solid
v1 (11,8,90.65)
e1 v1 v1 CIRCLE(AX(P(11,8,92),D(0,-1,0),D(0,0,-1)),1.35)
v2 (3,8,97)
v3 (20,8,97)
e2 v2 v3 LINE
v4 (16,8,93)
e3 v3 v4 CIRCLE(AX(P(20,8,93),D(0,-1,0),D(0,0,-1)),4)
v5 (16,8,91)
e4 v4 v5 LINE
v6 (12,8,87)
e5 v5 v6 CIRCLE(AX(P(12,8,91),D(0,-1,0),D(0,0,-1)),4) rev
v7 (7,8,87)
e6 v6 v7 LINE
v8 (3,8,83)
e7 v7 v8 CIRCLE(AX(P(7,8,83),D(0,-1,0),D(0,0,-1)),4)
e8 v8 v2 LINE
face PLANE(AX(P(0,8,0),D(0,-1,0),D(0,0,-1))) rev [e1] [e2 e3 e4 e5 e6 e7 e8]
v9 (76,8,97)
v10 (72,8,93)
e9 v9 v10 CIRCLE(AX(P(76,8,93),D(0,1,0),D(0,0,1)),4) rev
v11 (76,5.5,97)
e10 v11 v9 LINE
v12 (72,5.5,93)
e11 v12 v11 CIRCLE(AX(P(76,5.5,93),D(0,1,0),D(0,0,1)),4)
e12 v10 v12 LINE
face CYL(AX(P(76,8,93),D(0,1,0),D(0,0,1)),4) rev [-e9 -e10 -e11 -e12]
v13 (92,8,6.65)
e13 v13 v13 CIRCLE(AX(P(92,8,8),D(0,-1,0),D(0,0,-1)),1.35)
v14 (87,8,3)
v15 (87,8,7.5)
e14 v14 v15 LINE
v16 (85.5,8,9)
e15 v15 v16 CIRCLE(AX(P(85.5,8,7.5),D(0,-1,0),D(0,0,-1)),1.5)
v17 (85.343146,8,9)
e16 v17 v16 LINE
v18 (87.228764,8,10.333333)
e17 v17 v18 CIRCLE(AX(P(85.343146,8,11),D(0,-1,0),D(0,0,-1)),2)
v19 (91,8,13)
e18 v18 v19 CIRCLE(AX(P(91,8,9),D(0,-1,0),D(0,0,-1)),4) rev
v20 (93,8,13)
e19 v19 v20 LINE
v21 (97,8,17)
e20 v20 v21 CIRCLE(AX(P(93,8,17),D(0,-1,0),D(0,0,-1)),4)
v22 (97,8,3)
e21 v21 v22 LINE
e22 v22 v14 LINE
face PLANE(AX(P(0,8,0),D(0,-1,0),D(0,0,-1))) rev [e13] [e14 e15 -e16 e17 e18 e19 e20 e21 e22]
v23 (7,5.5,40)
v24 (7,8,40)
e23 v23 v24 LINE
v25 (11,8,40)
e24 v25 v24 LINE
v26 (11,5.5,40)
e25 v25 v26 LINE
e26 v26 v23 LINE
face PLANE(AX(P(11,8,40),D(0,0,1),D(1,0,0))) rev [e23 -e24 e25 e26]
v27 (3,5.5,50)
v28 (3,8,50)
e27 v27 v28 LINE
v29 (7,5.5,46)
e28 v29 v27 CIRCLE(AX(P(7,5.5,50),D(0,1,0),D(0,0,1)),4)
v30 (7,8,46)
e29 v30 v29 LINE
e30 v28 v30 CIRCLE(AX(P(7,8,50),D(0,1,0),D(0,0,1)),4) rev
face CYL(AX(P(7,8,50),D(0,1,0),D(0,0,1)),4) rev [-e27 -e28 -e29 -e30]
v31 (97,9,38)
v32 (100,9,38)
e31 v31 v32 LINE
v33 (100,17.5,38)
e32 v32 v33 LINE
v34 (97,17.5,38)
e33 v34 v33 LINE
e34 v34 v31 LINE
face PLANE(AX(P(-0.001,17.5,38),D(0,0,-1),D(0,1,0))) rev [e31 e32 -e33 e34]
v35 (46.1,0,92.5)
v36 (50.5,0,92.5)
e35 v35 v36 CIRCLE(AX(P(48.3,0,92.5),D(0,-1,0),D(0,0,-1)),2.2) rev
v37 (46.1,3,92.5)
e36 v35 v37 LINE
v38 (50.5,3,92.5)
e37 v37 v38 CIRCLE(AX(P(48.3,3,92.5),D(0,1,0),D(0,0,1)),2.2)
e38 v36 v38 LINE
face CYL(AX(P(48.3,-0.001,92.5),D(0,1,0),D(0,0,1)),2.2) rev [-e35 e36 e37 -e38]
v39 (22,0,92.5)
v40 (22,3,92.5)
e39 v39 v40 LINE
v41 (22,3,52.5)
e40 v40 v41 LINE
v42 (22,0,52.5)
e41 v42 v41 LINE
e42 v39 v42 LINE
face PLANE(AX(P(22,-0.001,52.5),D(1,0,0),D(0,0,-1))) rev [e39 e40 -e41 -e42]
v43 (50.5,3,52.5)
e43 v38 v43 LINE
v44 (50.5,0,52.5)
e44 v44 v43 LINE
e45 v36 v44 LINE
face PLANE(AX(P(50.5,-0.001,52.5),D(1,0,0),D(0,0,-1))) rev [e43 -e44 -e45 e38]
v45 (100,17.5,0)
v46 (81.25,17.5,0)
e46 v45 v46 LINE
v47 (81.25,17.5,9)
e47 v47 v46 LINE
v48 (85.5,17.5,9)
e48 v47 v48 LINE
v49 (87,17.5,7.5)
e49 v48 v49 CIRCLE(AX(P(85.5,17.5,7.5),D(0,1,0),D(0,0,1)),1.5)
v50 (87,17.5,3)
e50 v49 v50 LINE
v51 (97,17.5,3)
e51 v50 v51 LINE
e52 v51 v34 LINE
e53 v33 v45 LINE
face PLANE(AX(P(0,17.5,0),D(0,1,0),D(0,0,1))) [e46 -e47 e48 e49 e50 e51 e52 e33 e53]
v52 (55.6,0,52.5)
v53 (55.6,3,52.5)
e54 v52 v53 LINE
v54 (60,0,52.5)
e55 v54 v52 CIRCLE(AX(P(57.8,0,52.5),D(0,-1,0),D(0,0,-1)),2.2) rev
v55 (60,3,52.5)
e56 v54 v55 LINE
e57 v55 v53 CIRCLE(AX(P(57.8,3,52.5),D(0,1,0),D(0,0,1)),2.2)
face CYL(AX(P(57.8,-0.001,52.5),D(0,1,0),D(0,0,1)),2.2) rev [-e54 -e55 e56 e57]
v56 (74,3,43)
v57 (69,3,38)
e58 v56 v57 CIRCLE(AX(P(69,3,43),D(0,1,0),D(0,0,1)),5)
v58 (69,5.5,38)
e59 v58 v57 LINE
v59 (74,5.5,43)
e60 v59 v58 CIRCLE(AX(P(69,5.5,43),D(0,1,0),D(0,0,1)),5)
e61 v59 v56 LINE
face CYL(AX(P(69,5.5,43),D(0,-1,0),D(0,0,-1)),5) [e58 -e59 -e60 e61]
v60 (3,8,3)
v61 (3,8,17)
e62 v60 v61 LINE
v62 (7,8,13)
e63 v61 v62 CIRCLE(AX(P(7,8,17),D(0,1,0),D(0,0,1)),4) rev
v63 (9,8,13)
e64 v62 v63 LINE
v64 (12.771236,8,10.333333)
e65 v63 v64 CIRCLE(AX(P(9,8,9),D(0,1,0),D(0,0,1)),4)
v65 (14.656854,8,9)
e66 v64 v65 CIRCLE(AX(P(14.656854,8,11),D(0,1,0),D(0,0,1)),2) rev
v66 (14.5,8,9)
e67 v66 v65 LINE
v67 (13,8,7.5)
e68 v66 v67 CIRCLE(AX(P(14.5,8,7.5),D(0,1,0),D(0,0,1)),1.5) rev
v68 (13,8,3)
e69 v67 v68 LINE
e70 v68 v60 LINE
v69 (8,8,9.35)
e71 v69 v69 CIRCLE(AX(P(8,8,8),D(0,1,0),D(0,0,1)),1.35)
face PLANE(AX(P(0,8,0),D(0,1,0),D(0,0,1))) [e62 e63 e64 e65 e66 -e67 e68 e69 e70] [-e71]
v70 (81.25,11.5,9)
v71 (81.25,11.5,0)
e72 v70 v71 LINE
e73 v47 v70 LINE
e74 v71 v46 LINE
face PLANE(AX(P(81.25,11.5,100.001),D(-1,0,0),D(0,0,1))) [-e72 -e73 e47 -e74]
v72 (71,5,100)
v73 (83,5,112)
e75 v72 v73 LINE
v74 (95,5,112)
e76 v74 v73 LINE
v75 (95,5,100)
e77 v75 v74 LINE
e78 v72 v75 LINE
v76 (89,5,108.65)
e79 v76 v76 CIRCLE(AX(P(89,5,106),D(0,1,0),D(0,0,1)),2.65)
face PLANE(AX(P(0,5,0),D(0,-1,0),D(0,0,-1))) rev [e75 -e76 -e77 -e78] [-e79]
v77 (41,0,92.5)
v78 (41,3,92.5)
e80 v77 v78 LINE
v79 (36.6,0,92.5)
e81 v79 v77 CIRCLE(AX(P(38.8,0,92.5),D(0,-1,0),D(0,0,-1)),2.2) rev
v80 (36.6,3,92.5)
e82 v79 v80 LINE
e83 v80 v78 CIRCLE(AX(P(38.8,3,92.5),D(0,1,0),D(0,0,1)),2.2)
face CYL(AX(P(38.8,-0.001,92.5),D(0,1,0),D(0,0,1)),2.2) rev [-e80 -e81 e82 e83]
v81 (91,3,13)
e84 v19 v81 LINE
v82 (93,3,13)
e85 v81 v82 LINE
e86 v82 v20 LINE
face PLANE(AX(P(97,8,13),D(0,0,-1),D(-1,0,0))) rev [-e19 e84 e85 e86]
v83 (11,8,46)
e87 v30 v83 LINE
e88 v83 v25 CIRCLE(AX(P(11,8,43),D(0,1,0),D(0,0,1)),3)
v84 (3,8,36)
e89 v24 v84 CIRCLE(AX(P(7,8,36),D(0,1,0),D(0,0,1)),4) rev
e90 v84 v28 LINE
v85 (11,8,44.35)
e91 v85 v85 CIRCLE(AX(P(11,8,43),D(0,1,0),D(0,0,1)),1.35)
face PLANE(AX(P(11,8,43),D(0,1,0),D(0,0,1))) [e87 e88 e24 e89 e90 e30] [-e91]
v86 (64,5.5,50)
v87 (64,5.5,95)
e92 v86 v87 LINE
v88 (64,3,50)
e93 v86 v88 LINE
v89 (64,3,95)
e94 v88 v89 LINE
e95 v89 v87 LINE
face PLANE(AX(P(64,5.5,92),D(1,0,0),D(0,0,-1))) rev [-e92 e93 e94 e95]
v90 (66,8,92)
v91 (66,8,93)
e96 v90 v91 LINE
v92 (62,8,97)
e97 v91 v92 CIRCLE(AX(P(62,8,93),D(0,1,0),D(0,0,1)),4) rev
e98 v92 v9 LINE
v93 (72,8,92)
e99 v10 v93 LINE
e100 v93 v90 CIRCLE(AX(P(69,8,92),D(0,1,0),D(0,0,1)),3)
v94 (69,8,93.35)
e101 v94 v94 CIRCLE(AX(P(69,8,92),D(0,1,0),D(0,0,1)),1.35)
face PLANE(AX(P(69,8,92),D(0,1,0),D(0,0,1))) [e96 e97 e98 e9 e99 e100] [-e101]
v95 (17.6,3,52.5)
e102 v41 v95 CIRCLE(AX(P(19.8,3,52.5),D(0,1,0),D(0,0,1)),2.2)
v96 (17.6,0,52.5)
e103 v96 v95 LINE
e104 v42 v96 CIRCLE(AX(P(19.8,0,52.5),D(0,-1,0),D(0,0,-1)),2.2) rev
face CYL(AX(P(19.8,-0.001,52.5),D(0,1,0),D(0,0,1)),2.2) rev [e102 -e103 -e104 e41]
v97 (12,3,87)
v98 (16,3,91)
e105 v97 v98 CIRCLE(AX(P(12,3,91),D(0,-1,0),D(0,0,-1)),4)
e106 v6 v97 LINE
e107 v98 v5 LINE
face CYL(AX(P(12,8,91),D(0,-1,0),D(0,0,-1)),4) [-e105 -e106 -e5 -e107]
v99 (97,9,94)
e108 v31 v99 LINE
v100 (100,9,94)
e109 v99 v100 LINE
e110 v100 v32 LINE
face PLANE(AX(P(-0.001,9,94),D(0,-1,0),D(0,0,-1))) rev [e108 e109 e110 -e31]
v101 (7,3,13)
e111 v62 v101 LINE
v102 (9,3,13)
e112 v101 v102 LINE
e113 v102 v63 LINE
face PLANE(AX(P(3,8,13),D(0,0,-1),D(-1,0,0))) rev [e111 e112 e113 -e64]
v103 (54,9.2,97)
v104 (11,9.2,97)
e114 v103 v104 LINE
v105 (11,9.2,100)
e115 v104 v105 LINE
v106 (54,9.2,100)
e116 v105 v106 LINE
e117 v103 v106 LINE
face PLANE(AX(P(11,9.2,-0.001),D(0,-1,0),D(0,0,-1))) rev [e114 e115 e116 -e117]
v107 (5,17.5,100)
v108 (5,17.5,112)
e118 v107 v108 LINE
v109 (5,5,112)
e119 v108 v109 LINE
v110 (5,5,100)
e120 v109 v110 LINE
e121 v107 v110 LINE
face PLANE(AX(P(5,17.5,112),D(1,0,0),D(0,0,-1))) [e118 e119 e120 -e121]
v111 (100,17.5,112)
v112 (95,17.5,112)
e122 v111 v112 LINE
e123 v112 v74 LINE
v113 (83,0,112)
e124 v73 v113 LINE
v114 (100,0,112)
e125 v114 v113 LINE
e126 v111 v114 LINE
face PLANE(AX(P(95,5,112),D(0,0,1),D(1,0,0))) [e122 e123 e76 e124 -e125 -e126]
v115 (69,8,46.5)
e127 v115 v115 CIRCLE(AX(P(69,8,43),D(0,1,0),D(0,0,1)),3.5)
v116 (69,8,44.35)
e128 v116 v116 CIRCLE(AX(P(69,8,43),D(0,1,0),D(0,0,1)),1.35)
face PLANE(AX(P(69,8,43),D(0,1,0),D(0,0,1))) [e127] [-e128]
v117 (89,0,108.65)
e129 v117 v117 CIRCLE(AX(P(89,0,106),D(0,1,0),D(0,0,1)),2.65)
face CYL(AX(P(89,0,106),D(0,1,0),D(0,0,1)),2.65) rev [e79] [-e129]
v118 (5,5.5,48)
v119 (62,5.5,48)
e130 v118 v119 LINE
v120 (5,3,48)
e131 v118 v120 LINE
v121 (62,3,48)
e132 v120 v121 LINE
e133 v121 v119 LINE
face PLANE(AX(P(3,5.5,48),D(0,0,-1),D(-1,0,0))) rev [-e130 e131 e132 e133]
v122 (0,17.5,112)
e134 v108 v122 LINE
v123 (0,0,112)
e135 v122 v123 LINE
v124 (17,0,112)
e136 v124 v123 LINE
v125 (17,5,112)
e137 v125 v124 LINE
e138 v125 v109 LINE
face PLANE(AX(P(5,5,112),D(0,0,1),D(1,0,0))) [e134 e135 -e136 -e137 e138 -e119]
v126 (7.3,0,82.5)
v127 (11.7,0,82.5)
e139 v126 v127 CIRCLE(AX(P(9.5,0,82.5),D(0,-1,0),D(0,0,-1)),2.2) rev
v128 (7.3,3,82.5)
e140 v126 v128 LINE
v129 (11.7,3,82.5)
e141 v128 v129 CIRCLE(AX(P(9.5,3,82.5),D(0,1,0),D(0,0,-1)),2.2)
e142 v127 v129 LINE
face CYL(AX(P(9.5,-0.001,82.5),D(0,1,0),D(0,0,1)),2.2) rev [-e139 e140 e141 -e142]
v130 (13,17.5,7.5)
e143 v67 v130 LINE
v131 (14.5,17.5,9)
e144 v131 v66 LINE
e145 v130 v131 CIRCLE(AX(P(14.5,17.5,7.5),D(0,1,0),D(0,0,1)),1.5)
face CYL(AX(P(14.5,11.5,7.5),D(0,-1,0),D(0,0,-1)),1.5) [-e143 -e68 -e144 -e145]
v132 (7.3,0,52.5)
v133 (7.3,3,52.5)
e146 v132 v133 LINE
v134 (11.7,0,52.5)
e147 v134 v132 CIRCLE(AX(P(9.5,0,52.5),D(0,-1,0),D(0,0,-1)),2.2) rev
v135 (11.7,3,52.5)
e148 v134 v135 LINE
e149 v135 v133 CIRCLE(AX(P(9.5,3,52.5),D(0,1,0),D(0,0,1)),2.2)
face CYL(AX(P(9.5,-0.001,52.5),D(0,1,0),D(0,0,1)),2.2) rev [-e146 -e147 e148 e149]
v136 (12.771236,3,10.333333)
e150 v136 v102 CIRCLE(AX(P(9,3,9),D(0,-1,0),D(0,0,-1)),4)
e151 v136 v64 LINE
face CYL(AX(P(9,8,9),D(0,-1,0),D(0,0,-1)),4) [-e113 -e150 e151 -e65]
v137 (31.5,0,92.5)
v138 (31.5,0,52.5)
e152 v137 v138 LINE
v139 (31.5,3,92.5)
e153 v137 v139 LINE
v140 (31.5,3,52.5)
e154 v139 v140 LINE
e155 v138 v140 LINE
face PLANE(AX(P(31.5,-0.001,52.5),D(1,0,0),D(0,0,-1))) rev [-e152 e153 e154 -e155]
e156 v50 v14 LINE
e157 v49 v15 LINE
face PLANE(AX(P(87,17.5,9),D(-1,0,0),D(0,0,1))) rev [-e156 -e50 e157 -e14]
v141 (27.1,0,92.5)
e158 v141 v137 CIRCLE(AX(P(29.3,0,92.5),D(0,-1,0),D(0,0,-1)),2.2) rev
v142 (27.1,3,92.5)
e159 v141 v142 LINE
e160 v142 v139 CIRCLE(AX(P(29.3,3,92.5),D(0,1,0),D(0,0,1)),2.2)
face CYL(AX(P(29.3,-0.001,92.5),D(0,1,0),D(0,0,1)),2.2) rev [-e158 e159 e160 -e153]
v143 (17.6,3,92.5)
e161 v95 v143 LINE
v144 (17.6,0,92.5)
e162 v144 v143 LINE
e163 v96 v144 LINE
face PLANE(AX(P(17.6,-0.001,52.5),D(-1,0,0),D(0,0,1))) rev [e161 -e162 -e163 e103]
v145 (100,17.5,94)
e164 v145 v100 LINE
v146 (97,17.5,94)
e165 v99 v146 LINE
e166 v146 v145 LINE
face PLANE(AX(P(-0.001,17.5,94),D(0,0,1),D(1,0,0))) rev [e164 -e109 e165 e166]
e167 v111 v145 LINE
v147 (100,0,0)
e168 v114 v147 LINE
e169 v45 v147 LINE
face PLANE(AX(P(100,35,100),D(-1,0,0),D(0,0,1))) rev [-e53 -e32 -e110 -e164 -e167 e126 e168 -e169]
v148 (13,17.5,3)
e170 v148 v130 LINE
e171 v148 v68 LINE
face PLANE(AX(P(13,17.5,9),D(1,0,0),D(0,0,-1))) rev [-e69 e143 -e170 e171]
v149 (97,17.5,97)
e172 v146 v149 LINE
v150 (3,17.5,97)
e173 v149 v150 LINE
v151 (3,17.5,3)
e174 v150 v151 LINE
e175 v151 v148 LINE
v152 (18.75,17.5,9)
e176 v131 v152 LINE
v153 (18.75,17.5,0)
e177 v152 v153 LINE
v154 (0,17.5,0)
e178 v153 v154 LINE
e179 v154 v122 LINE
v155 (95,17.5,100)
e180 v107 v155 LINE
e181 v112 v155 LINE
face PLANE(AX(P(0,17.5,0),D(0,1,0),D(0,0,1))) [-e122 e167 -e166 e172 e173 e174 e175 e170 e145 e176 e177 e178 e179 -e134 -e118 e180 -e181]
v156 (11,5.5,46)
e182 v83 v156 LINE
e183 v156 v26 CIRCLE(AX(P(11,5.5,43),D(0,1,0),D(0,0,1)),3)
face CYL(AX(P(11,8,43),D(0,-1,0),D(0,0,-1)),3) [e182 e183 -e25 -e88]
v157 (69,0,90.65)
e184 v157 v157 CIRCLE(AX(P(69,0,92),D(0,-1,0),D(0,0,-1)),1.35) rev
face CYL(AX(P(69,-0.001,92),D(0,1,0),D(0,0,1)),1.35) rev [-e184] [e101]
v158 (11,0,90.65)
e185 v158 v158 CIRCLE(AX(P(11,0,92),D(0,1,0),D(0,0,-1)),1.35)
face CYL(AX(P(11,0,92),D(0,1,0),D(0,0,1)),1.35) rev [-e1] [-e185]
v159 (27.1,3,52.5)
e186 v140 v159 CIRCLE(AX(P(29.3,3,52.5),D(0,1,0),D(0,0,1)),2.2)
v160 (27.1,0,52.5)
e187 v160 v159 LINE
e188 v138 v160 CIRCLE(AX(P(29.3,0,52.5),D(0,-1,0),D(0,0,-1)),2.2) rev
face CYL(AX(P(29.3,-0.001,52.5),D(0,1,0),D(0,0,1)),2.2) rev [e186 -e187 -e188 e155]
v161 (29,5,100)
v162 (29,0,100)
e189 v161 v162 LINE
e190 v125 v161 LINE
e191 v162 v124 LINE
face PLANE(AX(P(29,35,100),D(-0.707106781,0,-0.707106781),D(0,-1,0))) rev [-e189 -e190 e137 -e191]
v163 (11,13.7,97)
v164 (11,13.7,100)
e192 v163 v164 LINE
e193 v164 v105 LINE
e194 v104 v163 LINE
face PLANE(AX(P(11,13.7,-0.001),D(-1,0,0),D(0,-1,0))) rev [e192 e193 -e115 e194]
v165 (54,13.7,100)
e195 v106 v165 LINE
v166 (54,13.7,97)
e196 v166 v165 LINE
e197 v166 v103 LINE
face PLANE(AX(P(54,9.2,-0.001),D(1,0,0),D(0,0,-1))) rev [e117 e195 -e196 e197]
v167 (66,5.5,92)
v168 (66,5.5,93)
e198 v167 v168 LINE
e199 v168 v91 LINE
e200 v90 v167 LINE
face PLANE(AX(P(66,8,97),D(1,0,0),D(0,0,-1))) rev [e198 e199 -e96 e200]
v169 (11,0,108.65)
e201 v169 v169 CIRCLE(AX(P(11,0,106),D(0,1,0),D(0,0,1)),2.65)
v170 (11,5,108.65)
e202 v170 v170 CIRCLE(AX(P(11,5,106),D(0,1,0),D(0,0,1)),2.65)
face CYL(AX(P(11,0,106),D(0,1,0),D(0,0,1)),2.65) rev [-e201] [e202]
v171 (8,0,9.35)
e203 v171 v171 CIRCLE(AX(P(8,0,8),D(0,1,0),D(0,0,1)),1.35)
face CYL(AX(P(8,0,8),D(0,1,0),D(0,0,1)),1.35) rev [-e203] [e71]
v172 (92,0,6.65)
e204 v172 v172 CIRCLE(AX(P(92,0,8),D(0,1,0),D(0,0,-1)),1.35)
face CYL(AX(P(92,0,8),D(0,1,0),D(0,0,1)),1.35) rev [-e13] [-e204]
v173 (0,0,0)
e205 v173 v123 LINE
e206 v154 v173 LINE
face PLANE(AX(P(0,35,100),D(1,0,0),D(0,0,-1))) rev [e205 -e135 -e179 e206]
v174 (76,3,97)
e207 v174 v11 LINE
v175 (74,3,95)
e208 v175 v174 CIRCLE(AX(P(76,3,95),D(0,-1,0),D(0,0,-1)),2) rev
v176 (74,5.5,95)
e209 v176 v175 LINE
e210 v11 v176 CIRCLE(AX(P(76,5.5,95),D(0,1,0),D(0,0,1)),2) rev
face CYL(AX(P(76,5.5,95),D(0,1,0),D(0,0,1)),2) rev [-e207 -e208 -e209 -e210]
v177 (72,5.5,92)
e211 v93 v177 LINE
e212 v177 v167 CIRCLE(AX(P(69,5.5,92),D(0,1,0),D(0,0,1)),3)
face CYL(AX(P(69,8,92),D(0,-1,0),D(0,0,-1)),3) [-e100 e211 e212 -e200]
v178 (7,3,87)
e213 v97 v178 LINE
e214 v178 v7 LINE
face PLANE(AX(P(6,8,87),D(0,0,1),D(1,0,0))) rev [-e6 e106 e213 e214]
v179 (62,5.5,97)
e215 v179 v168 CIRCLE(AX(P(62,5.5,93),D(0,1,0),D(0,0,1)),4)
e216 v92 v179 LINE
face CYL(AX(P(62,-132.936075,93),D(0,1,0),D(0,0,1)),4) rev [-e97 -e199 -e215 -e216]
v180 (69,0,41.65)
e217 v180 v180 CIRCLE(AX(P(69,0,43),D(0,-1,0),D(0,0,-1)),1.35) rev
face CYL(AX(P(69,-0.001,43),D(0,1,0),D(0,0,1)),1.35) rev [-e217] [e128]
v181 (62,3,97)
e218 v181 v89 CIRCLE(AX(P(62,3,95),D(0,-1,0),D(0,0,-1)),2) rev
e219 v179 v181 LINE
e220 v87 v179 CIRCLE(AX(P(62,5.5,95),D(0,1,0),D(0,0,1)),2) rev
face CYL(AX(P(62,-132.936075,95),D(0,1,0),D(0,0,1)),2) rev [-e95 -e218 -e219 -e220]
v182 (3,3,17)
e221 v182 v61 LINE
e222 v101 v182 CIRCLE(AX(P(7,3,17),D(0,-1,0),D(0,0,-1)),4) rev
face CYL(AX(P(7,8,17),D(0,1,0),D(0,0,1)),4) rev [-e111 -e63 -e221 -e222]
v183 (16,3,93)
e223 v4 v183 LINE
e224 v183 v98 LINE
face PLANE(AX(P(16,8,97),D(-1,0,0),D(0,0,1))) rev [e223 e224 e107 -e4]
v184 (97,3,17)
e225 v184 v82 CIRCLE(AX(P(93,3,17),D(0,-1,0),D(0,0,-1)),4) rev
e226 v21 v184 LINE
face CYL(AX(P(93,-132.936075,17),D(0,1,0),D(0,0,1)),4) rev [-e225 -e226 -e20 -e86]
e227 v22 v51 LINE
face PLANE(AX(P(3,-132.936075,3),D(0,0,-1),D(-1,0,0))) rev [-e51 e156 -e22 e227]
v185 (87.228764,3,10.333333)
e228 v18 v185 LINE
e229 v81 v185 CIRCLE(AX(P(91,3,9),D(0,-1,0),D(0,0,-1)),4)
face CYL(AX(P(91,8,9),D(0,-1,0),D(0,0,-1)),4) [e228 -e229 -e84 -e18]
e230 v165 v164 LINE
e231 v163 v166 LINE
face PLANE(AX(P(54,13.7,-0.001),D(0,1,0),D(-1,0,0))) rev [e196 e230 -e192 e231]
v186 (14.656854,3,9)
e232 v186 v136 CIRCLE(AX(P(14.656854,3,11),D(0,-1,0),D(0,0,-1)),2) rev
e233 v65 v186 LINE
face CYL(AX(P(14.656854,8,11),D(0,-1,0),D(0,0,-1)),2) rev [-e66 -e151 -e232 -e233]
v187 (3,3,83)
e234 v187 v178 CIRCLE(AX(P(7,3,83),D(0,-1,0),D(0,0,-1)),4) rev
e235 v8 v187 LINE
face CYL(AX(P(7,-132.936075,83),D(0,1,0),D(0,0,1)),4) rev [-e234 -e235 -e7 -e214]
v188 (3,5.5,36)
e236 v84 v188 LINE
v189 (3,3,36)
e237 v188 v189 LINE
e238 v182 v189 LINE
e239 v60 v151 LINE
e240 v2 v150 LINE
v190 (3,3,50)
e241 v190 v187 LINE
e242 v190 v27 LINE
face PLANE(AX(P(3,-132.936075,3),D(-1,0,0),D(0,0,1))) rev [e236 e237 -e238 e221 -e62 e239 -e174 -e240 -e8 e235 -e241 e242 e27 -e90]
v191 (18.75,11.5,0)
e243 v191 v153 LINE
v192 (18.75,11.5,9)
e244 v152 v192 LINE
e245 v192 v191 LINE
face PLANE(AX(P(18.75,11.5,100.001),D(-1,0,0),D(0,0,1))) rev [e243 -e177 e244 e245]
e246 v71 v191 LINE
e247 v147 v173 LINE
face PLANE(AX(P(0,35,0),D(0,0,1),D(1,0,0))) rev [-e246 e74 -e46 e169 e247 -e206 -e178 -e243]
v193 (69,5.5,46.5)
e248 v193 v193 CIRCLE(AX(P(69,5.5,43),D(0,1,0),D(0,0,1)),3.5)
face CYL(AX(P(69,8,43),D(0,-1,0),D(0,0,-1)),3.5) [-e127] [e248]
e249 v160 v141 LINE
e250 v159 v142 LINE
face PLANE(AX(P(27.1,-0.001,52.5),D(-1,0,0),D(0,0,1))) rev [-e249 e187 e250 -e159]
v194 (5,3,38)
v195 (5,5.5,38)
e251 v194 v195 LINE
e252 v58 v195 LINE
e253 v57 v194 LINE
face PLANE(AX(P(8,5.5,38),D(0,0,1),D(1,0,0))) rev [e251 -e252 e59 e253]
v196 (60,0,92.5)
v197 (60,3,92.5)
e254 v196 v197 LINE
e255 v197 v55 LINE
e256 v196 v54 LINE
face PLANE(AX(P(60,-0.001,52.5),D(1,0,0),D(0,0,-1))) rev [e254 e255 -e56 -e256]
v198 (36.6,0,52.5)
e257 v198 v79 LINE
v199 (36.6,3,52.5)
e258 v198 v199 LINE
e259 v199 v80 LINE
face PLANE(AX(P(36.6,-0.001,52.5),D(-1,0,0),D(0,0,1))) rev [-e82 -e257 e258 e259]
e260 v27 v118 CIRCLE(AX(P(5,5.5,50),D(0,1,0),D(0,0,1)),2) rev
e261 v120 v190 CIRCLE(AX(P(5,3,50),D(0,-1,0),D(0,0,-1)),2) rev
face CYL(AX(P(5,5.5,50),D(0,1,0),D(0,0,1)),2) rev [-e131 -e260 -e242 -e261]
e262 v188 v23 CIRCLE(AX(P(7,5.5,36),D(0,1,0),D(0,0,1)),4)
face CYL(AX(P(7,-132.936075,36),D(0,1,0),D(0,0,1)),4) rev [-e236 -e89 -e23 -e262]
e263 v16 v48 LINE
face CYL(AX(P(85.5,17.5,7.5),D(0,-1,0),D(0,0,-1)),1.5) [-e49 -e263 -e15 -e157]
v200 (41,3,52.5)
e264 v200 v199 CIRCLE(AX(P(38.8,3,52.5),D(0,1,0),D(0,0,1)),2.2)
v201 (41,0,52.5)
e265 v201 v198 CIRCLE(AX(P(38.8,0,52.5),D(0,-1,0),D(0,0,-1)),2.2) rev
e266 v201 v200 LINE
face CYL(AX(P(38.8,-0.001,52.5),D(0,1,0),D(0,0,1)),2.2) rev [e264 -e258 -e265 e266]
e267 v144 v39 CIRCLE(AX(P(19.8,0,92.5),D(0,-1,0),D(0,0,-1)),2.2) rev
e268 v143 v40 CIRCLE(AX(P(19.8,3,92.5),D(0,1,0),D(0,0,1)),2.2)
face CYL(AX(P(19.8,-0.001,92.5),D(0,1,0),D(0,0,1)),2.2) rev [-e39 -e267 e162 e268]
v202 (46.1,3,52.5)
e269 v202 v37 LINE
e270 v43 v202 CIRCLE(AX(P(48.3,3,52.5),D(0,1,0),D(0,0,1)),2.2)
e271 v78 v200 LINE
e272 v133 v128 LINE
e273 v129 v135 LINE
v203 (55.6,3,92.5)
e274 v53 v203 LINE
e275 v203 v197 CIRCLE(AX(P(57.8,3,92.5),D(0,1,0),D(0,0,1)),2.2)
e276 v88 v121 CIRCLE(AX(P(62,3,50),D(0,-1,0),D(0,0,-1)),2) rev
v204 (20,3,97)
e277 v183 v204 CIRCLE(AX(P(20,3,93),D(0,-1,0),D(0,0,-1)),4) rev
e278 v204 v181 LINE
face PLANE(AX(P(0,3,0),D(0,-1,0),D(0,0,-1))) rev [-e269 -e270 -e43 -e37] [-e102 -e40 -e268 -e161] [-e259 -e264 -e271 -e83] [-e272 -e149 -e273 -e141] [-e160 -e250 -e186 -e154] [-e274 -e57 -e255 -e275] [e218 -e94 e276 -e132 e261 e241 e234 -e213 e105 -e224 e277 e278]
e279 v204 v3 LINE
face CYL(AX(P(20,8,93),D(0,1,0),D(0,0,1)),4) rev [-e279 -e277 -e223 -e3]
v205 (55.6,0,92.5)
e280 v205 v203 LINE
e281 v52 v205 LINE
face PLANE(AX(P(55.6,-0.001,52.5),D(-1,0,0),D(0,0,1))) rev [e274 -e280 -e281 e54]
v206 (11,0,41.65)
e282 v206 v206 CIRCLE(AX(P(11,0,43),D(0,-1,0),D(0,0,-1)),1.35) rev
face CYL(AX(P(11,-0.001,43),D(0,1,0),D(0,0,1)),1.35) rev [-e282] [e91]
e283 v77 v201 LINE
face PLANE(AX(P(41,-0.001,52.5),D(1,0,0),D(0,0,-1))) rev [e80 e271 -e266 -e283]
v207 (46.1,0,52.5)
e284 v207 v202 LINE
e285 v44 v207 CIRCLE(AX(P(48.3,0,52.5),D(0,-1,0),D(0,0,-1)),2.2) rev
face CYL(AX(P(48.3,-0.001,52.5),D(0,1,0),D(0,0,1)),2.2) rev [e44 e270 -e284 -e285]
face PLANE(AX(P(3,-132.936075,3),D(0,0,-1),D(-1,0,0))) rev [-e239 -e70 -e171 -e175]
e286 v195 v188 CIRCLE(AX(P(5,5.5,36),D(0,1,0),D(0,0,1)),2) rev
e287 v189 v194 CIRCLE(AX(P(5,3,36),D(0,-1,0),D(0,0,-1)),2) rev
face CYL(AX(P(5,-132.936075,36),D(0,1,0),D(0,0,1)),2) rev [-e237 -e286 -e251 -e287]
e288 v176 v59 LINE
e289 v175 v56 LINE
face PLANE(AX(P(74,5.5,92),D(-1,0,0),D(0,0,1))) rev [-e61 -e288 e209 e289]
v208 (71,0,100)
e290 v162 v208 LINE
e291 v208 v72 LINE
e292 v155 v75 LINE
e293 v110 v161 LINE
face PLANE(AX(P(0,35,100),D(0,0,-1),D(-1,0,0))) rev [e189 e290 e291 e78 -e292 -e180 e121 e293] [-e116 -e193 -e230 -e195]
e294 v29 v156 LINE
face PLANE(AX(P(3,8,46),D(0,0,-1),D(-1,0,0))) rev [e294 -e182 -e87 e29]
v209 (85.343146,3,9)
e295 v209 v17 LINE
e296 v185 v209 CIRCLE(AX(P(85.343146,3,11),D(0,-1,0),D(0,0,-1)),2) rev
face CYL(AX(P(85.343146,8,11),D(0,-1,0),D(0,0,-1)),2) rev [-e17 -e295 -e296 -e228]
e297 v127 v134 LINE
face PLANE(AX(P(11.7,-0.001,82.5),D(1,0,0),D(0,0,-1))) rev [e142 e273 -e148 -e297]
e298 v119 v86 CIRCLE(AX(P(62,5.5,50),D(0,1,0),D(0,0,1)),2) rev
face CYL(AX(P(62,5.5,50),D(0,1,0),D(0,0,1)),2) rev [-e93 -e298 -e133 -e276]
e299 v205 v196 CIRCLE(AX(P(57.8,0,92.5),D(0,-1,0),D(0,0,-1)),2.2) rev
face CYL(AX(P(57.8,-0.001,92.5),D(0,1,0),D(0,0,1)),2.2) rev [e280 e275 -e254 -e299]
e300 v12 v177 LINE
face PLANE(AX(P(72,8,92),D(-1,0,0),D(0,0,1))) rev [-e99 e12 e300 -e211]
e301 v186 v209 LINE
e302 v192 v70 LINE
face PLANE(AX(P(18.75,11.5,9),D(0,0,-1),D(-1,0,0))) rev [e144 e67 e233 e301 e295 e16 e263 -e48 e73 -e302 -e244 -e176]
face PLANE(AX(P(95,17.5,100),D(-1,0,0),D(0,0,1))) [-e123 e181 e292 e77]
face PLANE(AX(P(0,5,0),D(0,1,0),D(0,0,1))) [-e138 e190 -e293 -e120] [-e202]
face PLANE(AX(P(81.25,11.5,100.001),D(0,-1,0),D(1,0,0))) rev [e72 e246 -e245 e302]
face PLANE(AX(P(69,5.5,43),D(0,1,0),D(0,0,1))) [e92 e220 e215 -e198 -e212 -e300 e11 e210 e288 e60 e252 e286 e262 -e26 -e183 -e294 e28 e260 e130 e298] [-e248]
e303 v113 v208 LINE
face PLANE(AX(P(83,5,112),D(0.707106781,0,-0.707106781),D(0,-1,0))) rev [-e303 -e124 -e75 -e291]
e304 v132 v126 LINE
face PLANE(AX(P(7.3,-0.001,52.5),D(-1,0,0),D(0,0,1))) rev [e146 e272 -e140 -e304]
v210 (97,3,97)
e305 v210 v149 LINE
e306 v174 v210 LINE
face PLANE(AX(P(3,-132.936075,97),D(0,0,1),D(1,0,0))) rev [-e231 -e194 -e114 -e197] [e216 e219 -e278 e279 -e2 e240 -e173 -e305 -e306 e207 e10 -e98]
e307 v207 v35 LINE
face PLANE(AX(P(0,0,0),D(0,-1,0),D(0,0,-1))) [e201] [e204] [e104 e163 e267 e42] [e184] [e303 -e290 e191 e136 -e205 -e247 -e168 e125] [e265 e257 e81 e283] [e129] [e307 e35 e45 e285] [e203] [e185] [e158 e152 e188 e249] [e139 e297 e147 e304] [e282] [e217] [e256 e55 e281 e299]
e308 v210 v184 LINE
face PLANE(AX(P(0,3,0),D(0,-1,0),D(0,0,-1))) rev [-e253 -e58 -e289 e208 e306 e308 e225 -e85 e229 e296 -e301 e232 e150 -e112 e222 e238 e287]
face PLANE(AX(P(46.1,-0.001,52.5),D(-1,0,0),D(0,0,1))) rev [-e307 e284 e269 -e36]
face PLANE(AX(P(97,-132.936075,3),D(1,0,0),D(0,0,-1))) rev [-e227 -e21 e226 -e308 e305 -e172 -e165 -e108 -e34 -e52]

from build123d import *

# Parameters (mm, degrees)
STOCK_D_1_OUTLINE_W     = 100
STOCK_D_1_OUTLINE_H     = 100
STOCK_D_1_DEPTH         = 3
STOCK_D_1_START         = 3
STOCK_D_1_2_OUTLINE_W   = 100
STOCK_D_1_2_OUTLINE_H   = 100
STOCK_D_1_2_OUTLINE_W_2 = 94
STOCK_D_1_2_OUTLINE_H_2 = 94
STOCK_D_1_2_DEPTH       = 14.5
SKETCH1_W               = 10
SKETCH1_H               = 10
BOSS_EXTRUDE1_DEPTH     = 5
CUT_EXTRUDE1_DEPTH      = 143.162758836
CUT_EXTRUDE1_DEPTH_BACK = 143.162758836
SKETCH3_R               = 1.35
SKETCH22_W              = 3
SKETCH22_H              = 10
BOSS_EXTRUDE7_DEPTH     = 5
FILLET8_R               = 4
BOSS_EXTRUDE5_DEPTH     = 2.5
SKETCH14_R              = 3.5
BOSS_EXTRUDE6_DEPTH     = 2.5
CUT_EXTRUDE2_REACH      = 144.5
SKETCH5_W               = 62.5
SKETCH5_H               = 6
SKETCH11_W              = 62.5
SKETCH11_H              = 6
BOSS_EXTRUDE3_DEPTH     = 8.5
SKETCH13_W              = 5.75
SKETCH13_H              = 6
BOSS_EXTRUDE4_DEPTH     = 14.5
SKETCH16_R              = 1.35
CUT_EXTRUDE3_DEPTH      = 8
CUT_EXTRUDE4_REACH      = 144.5
SKETCH17_W              = 43
SKETCH17_H              = 4.5
CUT_EXTRUDE5_REACH      = 144.5
SKETCH18_W              = 56
SKETCH18_H              = 8.5
FILLET10_R              = 2
FILLET11_R              = 2
FILLET13_R              = 1.5
FILLET14_R              = 4
CUT_EXTRUDE7_REACH      = 144.163
SKETCH23_W              = 12
SKETCH23_H              = 12
BOSS_EXTRUDE8_DEPTH     = 5
SKETCH24_R              = 2.65
CUT_EXTRUDE8_DEPTH      = 151.666021385
SKETCH26_W              = 5
SKETCH26_H              = 12
BOSS_EXTRUDE9_DEPTH     = 17.5
CHAMFER3_SIZE           = 12


with BuildPart() as part:
    # Stock-Dėžė-1: read off the stored shape, not the designer's step
    # Stock-Dėžė-1 outline → Stock-Dėžė-1 (new body)
    with BuildSketch(Plane(origin=(0, 0, 0), x_dir=(1, 0, 0), z_dir=(0, 1, 0))):
        with Locations((50, -50)):
            Rectangle(STOCK_D_1_OUTLINE_W, STOCK_D_1_OUTLINE_H)
    extrude(amount=STOCK_D_1_DEPTH)

    # Stock-D_-1 2 outline → Stock-D_-1 2 (add)
    with BuildSketch(Plane(origin=(0, 0, 0), x_dir=(1, 0, 0), z_dir=(0, 1, 0)).offset(STOCK_D_1_START)):
        with Locations((50, -50)):
            Rectangle(STOCK_D_1_2_OUTLINE_W, STOCK_D_1_2_OUTLINE_H)
        with Locations((50, -50)):
            Rectangle(STOCK_D_1_2_OUTLINE_W_2, STOCK_D_1_2_OUTLINE_H_2, mode=Mode.SUBTRACT)
    extrude(amount=STOCK_D_1_2_DEPTH)

    # Sketch1 → Boss-Extrude1 (add)
    with BuildSketch(Plane(origin=(0, 3, 0), x_dir=(1, 0, 0), z_dir=(0, 1, 0))):
        with Locations((8, -8)):
            Rectangle(SKETCH1_W, SKETCH1_H)
        with Locations((92, -8)):
            Rectangle(SKETCH1_W, SKETCH1_H)
        with Locations((11, -92)):
            Rectangle(SKETCH1_W, SKETCH1_H)
    extrude(amount=BOSS_EXTRUDE1_DEPTH)

    # Sketch3 → Cut-Extrude1 (cut, two sides: drawn at the far end of the back side and taken through both)
    with BuildSketch(Plane(origin=(0, 3, 0), x_dir=(1, 0, 0), z_dir=(0, 1, 0)).offset(-CUT_EXTRUDE1_DEPTH_BACK)):
        with Locations(Location((8, -8, 0), (0, 0, 270))):
            Circle(SKETCH3_R)
        with Locations(Location((11, -92, 0), (0, 0, 90))):
            Circle(SKETCH3_R)
        with Locations(Location((92, -8, 0), (0, 0, 90))):
            Circle(SKETCH3_R)
    extrude(amount=CUT_EXTRUDE1_DEPTH + CUT_EXTRUDE1_DEPTH_BACK, mode=Mode.SUBTRACT)

    # Sketch22 → Boss-Extrude7 (add)
    with BuildSketch(Plane(origin=(0, 3, 0), x_dir=(1, 0, 0), z_dir=(0, 1, 0))):
        with Locations((4.5, -92)):
            Rectangle(SKETCH22_W, SKETCH22_H)
    extrude(amount=BOSS_EXTRUDE7_DEPTH)

    # Fillet8
    fillet8_edges = [part.edges().sort_by_distance(p)[0] for p in [
        (3, 5.5, 13),
        (13, 5.5, 13),
        (97, 5.5, 13),
        (87, 5.5, 13),
        (16, 5.5, 97),
        (16, 5.5, 87),
        (3, 5.5, 87),
    ]]
    fillet(fillet8_edges, radius=FILLET8_R)

    # Sketch6 → Boss-Extrude5 (add)
    with BuildSketch(Plane(origin=(0, 3, 0), x_dir=(1, 0, 0), z_dir=(0, 1, 0))):
        with BuildLine():
            Line((64, -92), (64, -97))
            Line((64, -97), (74, -97))
            Line((74, -97), (74, -92))
            Line((74, -92), (74, -43))
            ThreePointArc((74, -43), (72.535533906, -39.464466094), (69, -38))
            Line((69, -38), (8, -38))
            Line((8, -38), (3, -38))
            Line((3, -38), (3, -48))
            Line((3, -48), (64, -48))
            Line((64, -48), (64, -92))
        make_face()
    extrude(amount=BOSS_EXTRUDE5_DEPTH)

    # Sketch14 → Boss-Extrude6 (add)
    with BuildSketch(Plane(origin=(0, 5.5, 0), x_dir=(1, 0, 0), z_dir=(0, 1, 0))):
        with Locations(Location((69, -43, 0), (0, 0, 270))):
            Circle(SKETCH14_R)
        with BuildLine():
            Line((11, -40), (3, -40))
            Line((3, -40), (3, -46))
            Line((3, -46), (11, -46))
            ThreePointArc((11, -46), (14, -43), (11, -40))
        make_face()
        with BuildLine():
            Line((72, -92), (72, -97))
            Line((72, -97), (66, -97))
            Line((66, -97), (66, -92))
            ThreePointArc((66, -92), (69, -89), (72, -92))
        make_face()
    extrude(amount=BOSS_EXTRUDE6_DEPTH)

    # Sketch5 → Cut-Extrude2 (cut, up to next)
    with BuildSketch(Plane(origin=(0, 0, 0), x_dir=(-1, 0, 0), z_dir=(0, 0, -1)), mode=Mode.PRIVATE) as cut_extrude2_sk1:
        with Locations((-50, 14.5)):
            Rectangle(SKETCH5_W, SKETCH5_H)
    cut_extrude2_tool1 = extrude(cut_extrude2_sk1.sketch, amount=-CUT_EXTRUDE2_REACH, mode=Mode.PRIVATE) & part.part
    add(cut_extrude2_tool1.solids().sort_by_distance((50, 14.5, 0))[0], mode=Mode.SUBTRACT)

    # Sketch11 → Boss-Extrude3 (add)
    with BuildSketch(Plane(origin=(0, 3, 0), x_dir=(1, 0, 0), z_dir=(0, 1, 0))):
        with Locations((50, -6)):
            Rectangle(SKETCH11_W, SKETCH11_H)
    extrude(amount=BOSS_EXTRUDE3_DEPTH)

    # Sketch13 → Boss-Extrude4 (add)
    with BuildSketch(Plane(origin=(0, 3, 0), x_dir=(1, 0, 0), z_dir=(0, 1, 0))):
        with Locations((15.875, -6)):
            Rectangle(SKETCH13_W, SKETCH13_H)
        with Locations((84.125, -6)):
            Rectangle(SKETCH13_W, SKETCH13_H)
    extrude(amount=BOSS_EXTRUDE4_DEPTH)

    # Sketch16 → Cut-Extrude3 (cut)
    with BuildSketch(Plane(origin=(0, 8, 0), x_dir=(1, 0, 0), z_dir=(0, 1, 0))):
        with Locations(Location((69, -43, 0), (0, 0, 270))):
            Circle(SKETCH16_R)
        with Locations(Location((11, -43, 0), (0, 0, 270))):
            Circle(SKETCH16_R)
        with Locations(Location((69, -92, 0), (0, 0, 270))):
            Circle(SKETCH16_R)
    extrude(amount=-CUT_EXTRUDE3_DEPTH, mode=Mode.SUBTRACT)

    # Sketch17 → Cut-Extrude4 (cut, up to next)
    with BuildSketch(Plane.XY.offset(100), mode=Mode.PRIVATE) as cut_extrude4_sk1:
        with Locations((32.5, 11.45)):
            Rectangle(SKETCH17_W, SKETCH17_H)
    cut_extrude4_tool1 = extrude(cut_extrude4_sk1.sketch, amount=-CUT_EXTRUDE4_REACH, mode=Mode.PRIVATE) & part.part
    add(cut_extrude4_tool1.solids().sort_by_distance((32.5, 11.45, 100))[0], mode=Mode.SUBTRACT)

    # Sketch18 → Cut-Extrude5 (cut, up to next)
    with BuildSketch(Plane(origin=(100, 0, 0), x_dir=(0, 0, -1), z_dir=(1, 0, 0)), mode=Mode.PRIVATE) as cut_extrude5_sk1:
        with Locations((-66, 13.25)):
            Rectangle(SKETCH18_W, SKETCH18_H)
    cut_extrude5_tool1 = extrude(cut_extrude5_sk1.sketch, amount=-CUT_EXTRUDE5_REACH, mode=Mode.PRIVATE) & part.part
    add(cut_extrude5_tool1.solids().sort_by_distance((100, 13.25, 66))[0], mode=Mode.SUBTRACT)

    # Fillet10
    fillet10_edges = [part.edges().sort_by_distance(p)[0] for p in [
        (87, 5.5, 9),
        (13, 5.5, 9),
    ]]
    fillet(fillet10_edges, radius=FILLET10_R)

    # Fillet11
    fillet11_edges = [part.edges().sort_by_distance(p)[0] for p in [
        (64, 4.25, 48),
        (64, 4.25, 97),
        (74, 4.25, 97),
        (3, 4.25, 38),
        (3, 4.25, 48),
    ]]
    fillet(fillet11_edges, radius=FILLET11_R)

    # Fillet13
    fillet13_edges = [part.edges().sort_by_distance(p)[0] for p in [
        (13, 12.75, 9),
        (87, 12.75, 9),
    ]]
    fillet(fillet13_edges, radius=FILLET13_R)

    # Fillet14
    fillet14_edges = [part.edges().sort_by_distance(p)[0] for p in [
        (72, 6.75, 97),
        (66, 6.75, 97),
        (3, 6.75, 40),
        (3, 6.75, 46),
    ]]
    fillet(fillet14_edges, radius=FILLET14_R)

    # Sketch21 → Cut-Extrude7 (cut, up to next)
    with BuildSketch(Plane(origin=(0, 3, 0), x_dir=(1, 0, 0), z_dir=(0, 1, 0)), mode=Mode.PRIVATE) as cut_extrude7_sk1:
        with BuildLine():
            Line((60, -52.5), (60, -92.5))
            ThreePointArc((60, -92.5), (57.8, -94.7), (55.6, -92.5))
            Line((55.6, -92.5), (55.6, -52.5))
            ThreePointArc((55.6, -52.5), (57.8, -50.3), (60, -52.5))
        make_face()
    cut_extrude7_tool1 = extrude(cut_extrude7_sk1.sketch, amount=-CUT_EXTRUDE7_REACH, mode=Mode.PRIVATE) & part.part
    # Sketch21 → Cut-Extrude7 (cut, up to next)
    with BuildSketch(Plane(origin=(0, 3, 0), x_dir=(1, 0, 0), z_dir=(0, 1, 0)), mode=Mode.PRIVATE) as cut_extrude7_sk2:
        with BuildLine():
            Line((46.1, -52.5), (46.1, -92.5))
            ThreePointArc((46.1, -92.5), (48.3, -94.7), (50.5, -92.5))
            Line((50.5, -92.5), (50.5, -52.5))
            ThreePointArc((50.5, -52.5), (48.3, -50.3), (46.1, -52.5))
        make_face()
    cut_extrude7_tool2 = extrude(cut_extrude7_sk2.sketch, amount=-CUT_EXTRUDE7_REACH, mode=Mode.PRIVATE) & part.part
    # Sketch21 → Cut-Extrude7 (cut, up to next)
    with BuildSketch(Plane(origin=(0, 3, 0), x_dir=(1, 0, 0), z_dir=(0, 1, 0)), mode=Mode.PRIVATE) as cut_extrude7_sk3:
        with BuildLine():
            Line((36.6, -52.5), (36.6, -92.5))
            ThreePointArc((36.6, -92.5), (38.8, -94.7), (41, -92.5))
            Line((41, -92.5), (41, -52.5))
            ThreePointArc((41, -52.5), (38.8, -50.3), (36.6, -52.5))
        make_face()
    cut_extrude7_tool3 = extrude(cut_extrude7_sk3.sketch, amount=-CUT_EXTRUDE7_REACH, mode=Mode.PRIVATE) & part.part
    # Sketch21 → Cut-Extrude7 (cut, up to next)
    with BuildSketch(Plane(origin=(0, 3, 0), x_dir=(1, 0, 0), z_dir=(0, 1, 0)), mode=Mode.PRIVATE) as cut_extrude7_sk4:
        with BuildLine():
            Line((27.1, -52.5), (27.1, -92.5))
            ThreePointArc((27.1, -92.5), (29.3, -94.7), (31.5, -92.5))
            Line((31.5, -92.5), (31.5, -52.5))
            ThreePointArc((31.5, -52.5), (29.3, -50.3), (27.1, -52.5))
        make_face()
    cut_extrude7_tool4 = extrude(cut_extrude7_sk4.sketch, amount=-CUT_EXTRUDE7_REACH, mode=Mode.PRIVATE) & part.part
    # Sketch21 → Cut-Extrude7 (cut, up to next)
    with BuildSketch(Plane(origin=(0, 3, 0), x_dir=(1, 0, 0), z_dir=(0, 1, 0)), mode=Mode.PRIVATE) as cut_extrude7_sk5:
        with BuildLine():
            Line((17.6, -52.5), (17.6, -92.5))
            ThreePointArc((17.6, -92.5), (19.8, -94.7), (22, -92.5))
            Line((22, -92.5), (22, -52.5))
            ThreePointArc((22, -52.5), (19.8, -50.3), (17.6, -52.5))
        make_face()
    cut_extrude7_tool5 = extrude(cut_extrude7_sk5.sketch, amount=-CUT_EXTRUDE7_REACH, mode=Mode.PRIVATE) & part.part
    # Sketch21 → Cut-Extrude7 (cut, up to next)
    with BuildSketch(Plane(origin=(0, 3, 0), x_dir=(1, 0, 0), z_dir=(0, 1, 0)), mode=Mode.PRIVATE) as cut_extrude7_sk6:
        with BuildLine():
            Line((7.3, -52.5), (7.3, -82.5))
            ThreePointArc((7.3, -82.5), (9.5, -84.7), (11.7, -82.5))
            Line((11.7, -82.5), (11.7, -52.5))
            ThreePointArc((11.7, -52.5), (9.5, -50.3), (7.3, -52.5))
        make_face()
    cut_extrude7_tool6 = extrude(cut_extrude7_sk6.sketch, amount=-CUT_EXTRUDE7_REACH, mode=Mode.PRIVATE) & part.part
    add(cut_extrude7_tool1.solids().sort_by_distance((57.8, 3, 72.5))[0], mode=Mode.SUBTRACT)
    add(cut_extrude7_tool2.solids().sort_by_distance((48.3, 3, 72.5))[0], mode=Mode.SUBTRACT)
    add(cut_extrude7_tool3.solids().sort_by_distance((38.8, 3, 72.5))[0], mode=Mode.SUBTRACT)
    add(cut_extrude7_tool4.solids().sort_by_distance((29.3, 3, 72.5))[0], mode=Mode.SUBTRACT)
    add(cut_extrude7_tool5.solids().sort_by_distance((19.8, 3, 72.5))[0], mode=Mode.SUBTRACT)
    add(cut_extrude7_tool6.solids().sort_by_distance((9.5, 3, 67.5))[0], mode=Mode.SUBTRACT)

    # Sketch23 → Boss-Extrude8 (add)
    with BuildSketch(Plane.XZ):
        with Locations((11, 106)):
            Rectangle(SKETCH23_W, SKETCH23_H)
        with Locations((89, 106)):
            Rectangle(SKETCH23_W, SKETCH23_H)
    extrude(amount=-BOSS_EXTRUDE8_DEPTH)

    # Sketch24 → Cut-Extrude8 (cut, through all)
    with BuildSketch(Plane(origin=(0, 5, 0), x_dir=(1, 0, 0), z_dir=(0, 1, 0))):
        with Locations(Location((11, -106, 0), (0, 0, 270))):
            Circle(SKETCH24_R)
        with Locations(Location((89, -106, 0), (0, 0, 270))):
            Circle(SKETCH24_R)
    extrude(amount=-CUT_EXTRUDE8_DEPTH, mode=Mode.SUBTRACT)

    # Sketch26 → Boss-Extrude9 (add)
    with BuildSketch(Plane.XZ):
        with Locations((2.5, 106)):
            Rectangle(SKETCH26_W, SKETCH26_H)
        with Locations((97.5, 106)):
            Rectangle(SKETCH26_W, SKETCH26_H)
    extrude(amount=-BOSS_EXTRUDE9_DEPTH)

    # Chamfer3
    chamfer3_edges = [part.edges().sort_by_distance(p)[0] for p in [
        (17, 2.5, 100),
        (83, 2.5, 100),
    ]]
    chamfer(chamfer3_edges, length=CHAMFER3_SIZE - 0.0001)  # a hair under: the kernel refuses the full size


solid = part.part
